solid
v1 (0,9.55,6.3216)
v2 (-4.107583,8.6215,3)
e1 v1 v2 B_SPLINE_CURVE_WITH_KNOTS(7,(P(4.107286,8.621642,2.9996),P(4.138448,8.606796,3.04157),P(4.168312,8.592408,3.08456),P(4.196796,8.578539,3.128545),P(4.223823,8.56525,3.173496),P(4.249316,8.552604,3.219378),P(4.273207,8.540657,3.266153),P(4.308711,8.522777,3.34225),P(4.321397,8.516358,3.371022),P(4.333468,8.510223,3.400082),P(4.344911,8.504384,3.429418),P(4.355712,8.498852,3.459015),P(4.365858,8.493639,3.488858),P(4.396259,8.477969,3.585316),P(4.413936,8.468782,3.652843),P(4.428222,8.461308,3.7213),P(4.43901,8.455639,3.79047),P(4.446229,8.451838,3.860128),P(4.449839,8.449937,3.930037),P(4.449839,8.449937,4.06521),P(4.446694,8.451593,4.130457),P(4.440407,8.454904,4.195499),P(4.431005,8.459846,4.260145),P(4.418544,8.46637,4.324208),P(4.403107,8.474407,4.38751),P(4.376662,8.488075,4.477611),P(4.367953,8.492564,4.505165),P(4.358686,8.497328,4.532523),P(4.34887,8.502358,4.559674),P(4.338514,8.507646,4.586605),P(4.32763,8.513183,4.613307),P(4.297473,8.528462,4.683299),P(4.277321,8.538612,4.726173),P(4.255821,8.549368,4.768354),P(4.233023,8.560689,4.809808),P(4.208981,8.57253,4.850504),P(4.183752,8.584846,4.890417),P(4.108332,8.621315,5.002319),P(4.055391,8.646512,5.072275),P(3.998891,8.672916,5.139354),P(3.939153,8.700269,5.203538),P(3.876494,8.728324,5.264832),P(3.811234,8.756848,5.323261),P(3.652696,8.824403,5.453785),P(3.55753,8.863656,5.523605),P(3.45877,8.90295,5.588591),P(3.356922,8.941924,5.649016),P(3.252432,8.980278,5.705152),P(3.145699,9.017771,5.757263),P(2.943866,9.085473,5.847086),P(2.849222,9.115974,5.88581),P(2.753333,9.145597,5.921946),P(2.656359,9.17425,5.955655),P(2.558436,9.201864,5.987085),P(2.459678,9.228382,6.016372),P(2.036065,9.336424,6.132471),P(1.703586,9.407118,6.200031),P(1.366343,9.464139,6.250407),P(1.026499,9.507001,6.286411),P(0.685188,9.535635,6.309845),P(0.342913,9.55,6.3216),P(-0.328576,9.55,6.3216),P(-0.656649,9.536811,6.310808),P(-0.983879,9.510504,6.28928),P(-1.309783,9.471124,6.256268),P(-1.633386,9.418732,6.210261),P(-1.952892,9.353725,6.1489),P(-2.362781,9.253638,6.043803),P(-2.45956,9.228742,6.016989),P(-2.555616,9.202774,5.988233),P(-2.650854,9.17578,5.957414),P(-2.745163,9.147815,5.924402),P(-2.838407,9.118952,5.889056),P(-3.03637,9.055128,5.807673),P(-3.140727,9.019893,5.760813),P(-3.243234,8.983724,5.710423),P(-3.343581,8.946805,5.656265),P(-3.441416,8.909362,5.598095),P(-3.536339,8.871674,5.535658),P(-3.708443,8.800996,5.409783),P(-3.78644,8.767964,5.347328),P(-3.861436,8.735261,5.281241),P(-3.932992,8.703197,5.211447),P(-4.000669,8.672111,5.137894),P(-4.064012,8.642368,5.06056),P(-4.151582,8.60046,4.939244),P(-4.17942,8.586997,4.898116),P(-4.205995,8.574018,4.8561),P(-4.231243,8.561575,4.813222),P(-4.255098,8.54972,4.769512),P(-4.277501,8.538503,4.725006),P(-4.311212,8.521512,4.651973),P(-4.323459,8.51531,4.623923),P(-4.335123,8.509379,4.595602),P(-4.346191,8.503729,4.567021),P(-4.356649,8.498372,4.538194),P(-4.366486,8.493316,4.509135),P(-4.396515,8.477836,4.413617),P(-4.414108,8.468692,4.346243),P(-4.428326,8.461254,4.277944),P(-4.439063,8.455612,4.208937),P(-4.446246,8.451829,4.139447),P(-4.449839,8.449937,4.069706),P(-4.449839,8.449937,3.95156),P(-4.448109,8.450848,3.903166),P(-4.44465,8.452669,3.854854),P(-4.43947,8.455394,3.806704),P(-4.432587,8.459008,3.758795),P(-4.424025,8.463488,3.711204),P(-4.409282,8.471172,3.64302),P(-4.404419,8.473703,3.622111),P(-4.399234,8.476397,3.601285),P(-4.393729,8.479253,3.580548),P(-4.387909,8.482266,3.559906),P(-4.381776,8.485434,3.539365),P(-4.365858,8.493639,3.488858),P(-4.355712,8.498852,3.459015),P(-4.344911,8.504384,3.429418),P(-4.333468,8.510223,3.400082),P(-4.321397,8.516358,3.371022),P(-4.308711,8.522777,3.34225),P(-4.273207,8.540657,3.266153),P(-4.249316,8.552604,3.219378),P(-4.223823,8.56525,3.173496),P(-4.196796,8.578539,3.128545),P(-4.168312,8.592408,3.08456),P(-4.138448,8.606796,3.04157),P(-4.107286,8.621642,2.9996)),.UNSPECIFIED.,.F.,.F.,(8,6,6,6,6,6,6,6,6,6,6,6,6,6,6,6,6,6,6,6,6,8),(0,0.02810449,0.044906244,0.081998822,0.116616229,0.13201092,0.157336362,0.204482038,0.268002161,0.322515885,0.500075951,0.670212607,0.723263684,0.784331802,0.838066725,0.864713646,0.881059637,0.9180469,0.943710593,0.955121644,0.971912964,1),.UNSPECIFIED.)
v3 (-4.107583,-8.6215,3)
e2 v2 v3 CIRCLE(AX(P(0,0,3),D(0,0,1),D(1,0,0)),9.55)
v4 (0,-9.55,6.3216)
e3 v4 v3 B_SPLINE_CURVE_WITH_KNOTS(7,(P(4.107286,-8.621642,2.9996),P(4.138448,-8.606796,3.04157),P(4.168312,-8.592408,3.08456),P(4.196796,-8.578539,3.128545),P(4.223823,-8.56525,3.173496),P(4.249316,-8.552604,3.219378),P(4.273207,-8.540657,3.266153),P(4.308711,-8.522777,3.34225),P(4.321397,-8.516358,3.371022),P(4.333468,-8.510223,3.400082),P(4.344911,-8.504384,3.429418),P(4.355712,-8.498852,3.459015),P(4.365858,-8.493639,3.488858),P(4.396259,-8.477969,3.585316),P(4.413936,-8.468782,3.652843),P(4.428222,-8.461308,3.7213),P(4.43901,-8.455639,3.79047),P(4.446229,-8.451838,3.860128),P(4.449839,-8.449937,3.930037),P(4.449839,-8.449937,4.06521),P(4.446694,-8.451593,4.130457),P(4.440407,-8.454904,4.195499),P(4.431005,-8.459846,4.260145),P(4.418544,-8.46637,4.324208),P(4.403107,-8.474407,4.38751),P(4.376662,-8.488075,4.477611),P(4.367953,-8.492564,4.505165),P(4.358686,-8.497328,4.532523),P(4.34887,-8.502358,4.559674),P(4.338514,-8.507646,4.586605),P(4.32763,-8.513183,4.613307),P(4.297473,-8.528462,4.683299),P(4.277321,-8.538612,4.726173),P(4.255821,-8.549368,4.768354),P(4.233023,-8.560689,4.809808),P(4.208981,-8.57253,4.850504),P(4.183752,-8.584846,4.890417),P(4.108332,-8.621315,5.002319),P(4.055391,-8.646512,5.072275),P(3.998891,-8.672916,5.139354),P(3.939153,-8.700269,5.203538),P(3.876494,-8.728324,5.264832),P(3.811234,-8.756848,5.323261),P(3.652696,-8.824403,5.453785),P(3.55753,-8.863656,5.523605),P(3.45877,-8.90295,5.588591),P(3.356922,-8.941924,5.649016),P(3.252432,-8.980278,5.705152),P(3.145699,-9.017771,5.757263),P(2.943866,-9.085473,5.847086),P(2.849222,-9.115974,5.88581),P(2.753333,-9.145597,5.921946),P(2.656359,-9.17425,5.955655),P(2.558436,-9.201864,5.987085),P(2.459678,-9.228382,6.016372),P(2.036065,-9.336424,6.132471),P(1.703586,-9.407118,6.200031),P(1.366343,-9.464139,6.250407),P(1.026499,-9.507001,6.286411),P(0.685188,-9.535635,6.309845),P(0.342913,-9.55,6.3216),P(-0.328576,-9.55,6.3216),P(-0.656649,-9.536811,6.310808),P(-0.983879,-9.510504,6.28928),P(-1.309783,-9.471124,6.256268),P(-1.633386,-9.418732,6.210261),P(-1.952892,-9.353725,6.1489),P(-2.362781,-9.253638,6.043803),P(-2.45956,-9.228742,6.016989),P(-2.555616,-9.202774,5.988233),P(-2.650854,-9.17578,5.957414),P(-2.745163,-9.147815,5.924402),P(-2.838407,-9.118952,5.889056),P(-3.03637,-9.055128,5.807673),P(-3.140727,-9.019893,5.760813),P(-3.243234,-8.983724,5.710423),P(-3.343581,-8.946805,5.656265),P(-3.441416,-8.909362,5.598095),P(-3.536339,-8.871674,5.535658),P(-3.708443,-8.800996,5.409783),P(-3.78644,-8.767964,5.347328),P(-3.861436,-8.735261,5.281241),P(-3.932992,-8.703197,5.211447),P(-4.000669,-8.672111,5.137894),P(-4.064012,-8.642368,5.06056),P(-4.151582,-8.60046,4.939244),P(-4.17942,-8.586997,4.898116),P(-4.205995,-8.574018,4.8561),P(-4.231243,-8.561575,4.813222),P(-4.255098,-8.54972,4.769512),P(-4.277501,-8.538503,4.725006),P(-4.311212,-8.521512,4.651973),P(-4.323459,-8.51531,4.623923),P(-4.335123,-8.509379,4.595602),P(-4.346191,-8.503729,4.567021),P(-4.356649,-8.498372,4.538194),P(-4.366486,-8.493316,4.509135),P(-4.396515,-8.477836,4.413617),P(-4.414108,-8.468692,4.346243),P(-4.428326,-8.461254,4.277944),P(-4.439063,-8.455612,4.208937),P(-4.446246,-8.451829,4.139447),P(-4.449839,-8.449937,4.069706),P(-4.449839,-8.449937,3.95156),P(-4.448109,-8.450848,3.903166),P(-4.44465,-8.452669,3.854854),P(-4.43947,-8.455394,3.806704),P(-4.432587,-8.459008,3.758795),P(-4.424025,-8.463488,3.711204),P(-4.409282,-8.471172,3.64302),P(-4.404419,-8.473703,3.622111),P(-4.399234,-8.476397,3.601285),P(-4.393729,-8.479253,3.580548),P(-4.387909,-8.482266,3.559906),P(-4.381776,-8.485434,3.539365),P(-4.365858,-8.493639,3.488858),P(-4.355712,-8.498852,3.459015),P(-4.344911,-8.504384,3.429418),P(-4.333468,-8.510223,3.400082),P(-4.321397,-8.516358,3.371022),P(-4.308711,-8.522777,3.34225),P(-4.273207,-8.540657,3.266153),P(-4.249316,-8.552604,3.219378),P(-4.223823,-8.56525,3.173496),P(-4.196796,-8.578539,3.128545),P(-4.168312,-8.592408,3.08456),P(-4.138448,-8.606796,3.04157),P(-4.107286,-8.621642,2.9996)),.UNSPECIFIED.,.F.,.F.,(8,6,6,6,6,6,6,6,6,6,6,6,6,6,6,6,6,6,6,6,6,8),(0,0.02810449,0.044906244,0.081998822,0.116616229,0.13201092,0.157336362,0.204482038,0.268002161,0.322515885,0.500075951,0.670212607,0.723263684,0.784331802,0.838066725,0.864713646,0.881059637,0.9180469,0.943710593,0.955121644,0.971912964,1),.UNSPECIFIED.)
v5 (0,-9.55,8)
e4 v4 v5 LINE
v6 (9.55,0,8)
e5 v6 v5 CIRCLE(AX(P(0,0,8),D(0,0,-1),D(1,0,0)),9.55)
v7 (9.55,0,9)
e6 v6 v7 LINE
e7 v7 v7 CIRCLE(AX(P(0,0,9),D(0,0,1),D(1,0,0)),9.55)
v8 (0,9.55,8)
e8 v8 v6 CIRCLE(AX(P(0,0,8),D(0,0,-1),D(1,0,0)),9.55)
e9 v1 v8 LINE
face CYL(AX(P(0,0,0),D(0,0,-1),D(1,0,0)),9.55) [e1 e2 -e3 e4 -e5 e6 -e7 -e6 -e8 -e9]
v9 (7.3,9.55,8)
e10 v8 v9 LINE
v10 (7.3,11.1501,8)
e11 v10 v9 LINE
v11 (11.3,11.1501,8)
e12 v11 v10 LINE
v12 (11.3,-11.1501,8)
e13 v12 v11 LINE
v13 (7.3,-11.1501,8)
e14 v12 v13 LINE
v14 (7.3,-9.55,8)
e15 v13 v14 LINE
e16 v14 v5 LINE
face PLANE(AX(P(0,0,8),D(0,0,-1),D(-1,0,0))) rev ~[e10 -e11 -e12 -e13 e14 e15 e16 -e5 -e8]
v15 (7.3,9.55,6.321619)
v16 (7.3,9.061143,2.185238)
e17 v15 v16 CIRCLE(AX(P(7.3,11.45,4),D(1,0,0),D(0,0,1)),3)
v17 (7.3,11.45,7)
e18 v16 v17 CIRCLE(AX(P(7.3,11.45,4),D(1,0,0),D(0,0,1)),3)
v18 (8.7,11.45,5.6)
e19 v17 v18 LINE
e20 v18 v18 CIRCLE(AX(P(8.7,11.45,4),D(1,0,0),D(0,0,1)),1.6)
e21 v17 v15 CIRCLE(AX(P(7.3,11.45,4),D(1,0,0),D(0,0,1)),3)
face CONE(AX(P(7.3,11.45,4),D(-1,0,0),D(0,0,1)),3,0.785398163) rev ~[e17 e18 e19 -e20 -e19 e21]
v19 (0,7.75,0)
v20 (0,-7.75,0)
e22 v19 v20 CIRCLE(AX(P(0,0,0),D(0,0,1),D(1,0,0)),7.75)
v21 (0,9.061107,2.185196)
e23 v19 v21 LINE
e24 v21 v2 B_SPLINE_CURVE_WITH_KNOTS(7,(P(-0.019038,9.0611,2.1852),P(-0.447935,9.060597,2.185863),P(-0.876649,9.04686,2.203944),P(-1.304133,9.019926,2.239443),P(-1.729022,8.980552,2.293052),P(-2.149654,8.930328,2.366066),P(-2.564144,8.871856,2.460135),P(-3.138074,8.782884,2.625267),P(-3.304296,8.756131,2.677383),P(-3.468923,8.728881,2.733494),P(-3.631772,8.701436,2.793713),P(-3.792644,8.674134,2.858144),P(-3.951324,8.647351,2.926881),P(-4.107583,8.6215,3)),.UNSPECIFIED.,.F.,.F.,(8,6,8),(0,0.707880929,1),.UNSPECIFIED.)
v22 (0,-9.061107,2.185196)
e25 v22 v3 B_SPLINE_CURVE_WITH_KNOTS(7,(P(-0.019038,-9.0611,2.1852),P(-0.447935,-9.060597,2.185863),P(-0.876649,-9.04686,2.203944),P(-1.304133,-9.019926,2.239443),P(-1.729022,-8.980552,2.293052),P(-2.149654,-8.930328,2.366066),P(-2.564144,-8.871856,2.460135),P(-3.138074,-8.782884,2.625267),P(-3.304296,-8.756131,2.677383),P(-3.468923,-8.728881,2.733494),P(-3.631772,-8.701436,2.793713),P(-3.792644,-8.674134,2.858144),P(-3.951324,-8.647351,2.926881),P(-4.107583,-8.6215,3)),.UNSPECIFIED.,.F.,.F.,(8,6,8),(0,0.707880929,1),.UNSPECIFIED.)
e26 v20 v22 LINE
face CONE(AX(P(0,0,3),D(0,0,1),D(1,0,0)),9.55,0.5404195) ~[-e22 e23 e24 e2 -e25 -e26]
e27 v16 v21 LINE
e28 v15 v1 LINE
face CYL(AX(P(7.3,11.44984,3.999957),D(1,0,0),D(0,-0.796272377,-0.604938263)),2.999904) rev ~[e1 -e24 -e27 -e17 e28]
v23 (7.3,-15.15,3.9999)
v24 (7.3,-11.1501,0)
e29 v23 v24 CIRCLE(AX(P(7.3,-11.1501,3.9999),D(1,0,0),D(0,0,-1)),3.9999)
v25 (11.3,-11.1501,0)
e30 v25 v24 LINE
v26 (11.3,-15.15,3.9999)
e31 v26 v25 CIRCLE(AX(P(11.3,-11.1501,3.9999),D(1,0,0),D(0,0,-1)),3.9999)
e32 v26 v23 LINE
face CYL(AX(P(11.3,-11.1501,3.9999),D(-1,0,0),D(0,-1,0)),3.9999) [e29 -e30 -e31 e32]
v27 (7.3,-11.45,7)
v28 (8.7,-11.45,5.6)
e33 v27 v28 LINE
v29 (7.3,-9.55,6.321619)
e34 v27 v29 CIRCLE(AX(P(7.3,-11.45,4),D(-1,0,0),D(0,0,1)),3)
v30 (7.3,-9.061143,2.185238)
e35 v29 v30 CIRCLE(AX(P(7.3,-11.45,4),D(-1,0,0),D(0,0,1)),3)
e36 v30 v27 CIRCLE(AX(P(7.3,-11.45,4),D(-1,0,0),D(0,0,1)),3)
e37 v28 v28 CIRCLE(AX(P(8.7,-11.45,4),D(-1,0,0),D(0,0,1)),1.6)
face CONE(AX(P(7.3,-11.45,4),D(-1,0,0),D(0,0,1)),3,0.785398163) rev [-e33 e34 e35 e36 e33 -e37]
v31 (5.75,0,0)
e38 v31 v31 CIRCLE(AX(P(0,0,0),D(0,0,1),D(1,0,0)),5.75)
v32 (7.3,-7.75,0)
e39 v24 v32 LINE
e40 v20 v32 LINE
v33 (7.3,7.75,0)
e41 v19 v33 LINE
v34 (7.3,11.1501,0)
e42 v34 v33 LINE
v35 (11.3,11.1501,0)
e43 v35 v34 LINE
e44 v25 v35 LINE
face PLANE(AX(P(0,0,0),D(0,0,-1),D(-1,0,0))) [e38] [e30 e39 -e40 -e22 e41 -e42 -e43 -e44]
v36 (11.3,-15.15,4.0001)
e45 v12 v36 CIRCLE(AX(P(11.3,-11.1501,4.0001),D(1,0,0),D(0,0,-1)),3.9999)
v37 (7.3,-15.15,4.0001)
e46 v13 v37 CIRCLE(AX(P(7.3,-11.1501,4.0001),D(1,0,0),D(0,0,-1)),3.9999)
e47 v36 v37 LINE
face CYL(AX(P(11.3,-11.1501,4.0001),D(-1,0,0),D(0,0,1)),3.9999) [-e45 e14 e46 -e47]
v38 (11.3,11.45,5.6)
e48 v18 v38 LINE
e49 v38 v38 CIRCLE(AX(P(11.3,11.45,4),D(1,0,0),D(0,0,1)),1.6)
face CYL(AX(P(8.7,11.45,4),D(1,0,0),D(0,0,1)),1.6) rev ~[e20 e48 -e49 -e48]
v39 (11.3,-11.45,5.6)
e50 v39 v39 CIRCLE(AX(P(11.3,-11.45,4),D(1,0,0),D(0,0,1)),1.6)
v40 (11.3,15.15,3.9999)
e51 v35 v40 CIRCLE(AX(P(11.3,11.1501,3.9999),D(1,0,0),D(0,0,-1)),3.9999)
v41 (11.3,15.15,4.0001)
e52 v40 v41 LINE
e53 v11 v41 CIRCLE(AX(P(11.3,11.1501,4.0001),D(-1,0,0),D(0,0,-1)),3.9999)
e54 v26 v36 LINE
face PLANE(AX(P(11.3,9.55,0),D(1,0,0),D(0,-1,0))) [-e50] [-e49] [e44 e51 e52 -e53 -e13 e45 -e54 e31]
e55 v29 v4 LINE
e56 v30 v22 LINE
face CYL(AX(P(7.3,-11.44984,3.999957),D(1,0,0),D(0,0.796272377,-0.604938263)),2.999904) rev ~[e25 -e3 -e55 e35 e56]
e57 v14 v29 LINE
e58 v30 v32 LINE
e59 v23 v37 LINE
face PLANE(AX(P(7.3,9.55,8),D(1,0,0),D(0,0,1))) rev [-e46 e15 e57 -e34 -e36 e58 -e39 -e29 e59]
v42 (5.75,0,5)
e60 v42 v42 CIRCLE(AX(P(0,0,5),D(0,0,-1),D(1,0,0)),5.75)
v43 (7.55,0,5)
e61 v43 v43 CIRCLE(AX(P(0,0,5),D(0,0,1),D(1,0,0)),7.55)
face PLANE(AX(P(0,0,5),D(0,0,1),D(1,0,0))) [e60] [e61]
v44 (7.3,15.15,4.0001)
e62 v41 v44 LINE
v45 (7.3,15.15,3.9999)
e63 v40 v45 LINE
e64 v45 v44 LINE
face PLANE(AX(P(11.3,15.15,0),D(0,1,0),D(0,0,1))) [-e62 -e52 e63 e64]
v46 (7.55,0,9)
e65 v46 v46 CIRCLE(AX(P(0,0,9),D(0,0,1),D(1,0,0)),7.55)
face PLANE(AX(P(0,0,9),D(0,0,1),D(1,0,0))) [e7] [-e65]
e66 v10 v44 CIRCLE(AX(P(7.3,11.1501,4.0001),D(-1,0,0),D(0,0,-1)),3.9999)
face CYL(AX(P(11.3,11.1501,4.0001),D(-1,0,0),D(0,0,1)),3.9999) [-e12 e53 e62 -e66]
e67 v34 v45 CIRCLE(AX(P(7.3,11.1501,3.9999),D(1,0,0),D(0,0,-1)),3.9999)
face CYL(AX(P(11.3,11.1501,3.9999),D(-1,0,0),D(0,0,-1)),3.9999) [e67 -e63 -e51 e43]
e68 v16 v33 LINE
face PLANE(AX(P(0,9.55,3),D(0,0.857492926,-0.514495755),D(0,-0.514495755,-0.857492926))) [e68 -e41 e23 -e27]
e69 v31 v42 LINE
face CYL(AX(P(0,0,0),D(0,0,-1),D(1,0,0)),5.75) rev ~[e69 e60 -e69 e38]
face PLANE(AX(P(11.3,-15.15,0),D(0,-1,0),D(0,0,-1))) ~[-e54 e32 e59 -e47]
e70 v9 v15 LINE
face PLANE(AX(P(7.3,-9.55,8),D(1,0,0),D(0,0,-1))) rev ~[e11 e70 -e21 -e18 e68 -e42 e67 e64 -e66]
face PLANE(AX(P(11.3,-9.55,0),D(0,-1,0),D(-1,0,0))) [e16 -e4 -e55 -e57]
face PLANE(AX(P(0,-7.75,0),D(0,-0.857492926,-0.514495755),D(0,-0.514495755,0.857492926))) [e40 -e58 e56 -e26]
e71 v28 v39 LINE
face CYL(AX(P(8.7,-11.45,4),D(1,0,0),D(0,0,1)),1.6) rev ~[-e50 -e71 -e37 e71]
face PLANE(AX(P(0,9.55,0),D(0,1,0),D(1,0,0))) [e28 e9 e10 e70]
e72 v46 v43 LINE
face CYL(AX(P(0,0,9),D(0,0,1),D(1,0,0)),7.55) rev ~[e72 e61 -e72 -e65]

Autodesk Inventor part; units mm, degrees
ref_plane "YZ Plane" through (0, 0, 0) normal (1, 0, 0) x (0, 1, 0)
ref_plane "XZ Plane" through (0, 0, 0) normal (0, 1, 0) x (-1, 0, 0)
sketch "Эскиз1" plane through (0, 0, 0) normal (0, 0, 1) x (1, 0, 0)
  circle A0 centre (0, 0) radius 5.75
  circle A1 centre (0, 0) radius 9.55
  dimension "d0" = 11.5
  dimension "d1" = 19.1
extrude "Выдавливание1" add sketch "Эскиз1" along normal blind 9
sketch "Эскиз2" plane through (0, 0, 9) normal (0, 0, 1) x (1, 0, 0)
  circle A0 centre (0, 0) radius 7.55
  dimension "d4" = 15.1
extrude "Выдавливание2" cut sketch "Эскиз2" against normal blind 4
chamfer "Фаска1" distance 3 distance2 1.8 1 edges at (-9.55, 0, 0) measured on face at (9.519, -0.7685, 6)
sketch "Эскиз3" plane through (0, 0, 0) normal (0, 0, -1) x (-1, 0, 0)
  circle A0 centre (0, 0) radius 5.75 projected
  circle A1 centre (0, 0) radius 7.75 projected
  circle A2 centre (0, 0) radius 9.55 projected
  line L0 (0, 9.55) -> (-11.3, 9.55)
  line L1 (-11.3, 9.55) -> (-11.3, -9.55)
  line L2 (-11.3, -9.55) -> (0, -9.55)
  line L3 (0, -9.55) -> (0, 9.55)
  point P0 (0, -7.75)
  point P1 (0, 7.75)
  dimension "d10" = 11.3
extrude "Выдавливание3" add sketch "Эскиз3" against normal blind 8 contours A1 L3 A2 | A2 L2 L1 L0 picked at (-0.7618, -8.8575)
sketch "Эскиз4" plane through (0, 7.75, 0) normal (-1, 0, 0) x (0, 0, 1)
  line L0 (3, 1.8) -> (0, 0) projected
  line L1 (0, 1.8) -> (3, 1.8) projected
  line L2 (0, 0) -> (0, 1.8) projected
  line L3 (0, -17.3) -> (3, -17.3) projected
  line L4 (0, -15.5) -> (3, -17.3) projected
  line L5 (0, -17.3) -> (0, -15.5) projected
  line L6 (0, -17.3) -> (3, -17.3) projected
  point P0 (0, -7.75)
extrude "Выдавливание4" cut sketch "Эскиз4" against normal through all
sketch "Эскиз5" plane through (11.3, -9.55, 8) normal (1, 0, 0) x (0, 0, -1)
  line L0 (0, 19.1) -> (0, 0) projected
  line L1 (0, 19.1) -> (8, 19.1)
  line L2 (8, 19.1) -> (8, 24.7)
  line L3 (8, 24.7) -> (0, 24.7)
  line L4 (0, 24.7) -> (0, 19.1)
  line L5 (8, 19.1) -> (5, 19.1)
  line L6 (5, 19.1) -> (5, 16.7)
  line L7 (5, 16.7) -> (8, 16.7)
  line L8 (8, 16.7) -> (8, 19.1)
  line L9 (5, 0) -> (5, 19.1) projected
  point P0 (8, 9.55)
  dimension "d15" = 8
  dimension "d16" = 5.6
  dimension "d26" = 8
extrude "Выдавливание5" add sketch "Эскиз5" against normal blind 4
sketch "Эскиз6" plane through (7.3, -9.55, 8) normal (-1, 0, 0) x (0, 0, 1)
  line L0 (-5, 19.1) -> (-8, 17.3) projected
  line L1 (0, 19.1) -> (-5, 19.1) projected
  line L2 (0, 19.1) -> (0, 24.7) projected
  line L3 (0, 24.7) -> (-8, 24.7) projected
  line L4 (-8, 24.7) -> (-8, 17.3) projected
  line L5 (-8, 24.7) -> (-8, 17.3) projected
  line L6 (-8, 21) -> (0, 21)
  line L7 (0, 19.1) -> (0, 24.7) projected
  point P0 (-8, 9.55)
  point P1 (-4, 21)
hole "Отверстие1" at (7.3, 11.45, 4) direction (1, 0, 0) diameter 3.2 end through all countersink diameter 6 countersink angle 90
sketch "Эскиз8" plane through (7.3, -9.55, 8) normal (-1, 0, 0) x (0, 0, 1)
  arc A0 (-1.6784, 19.1) -> (-5.8148, 18.6111) centre (-4, 21) ccw projected
  circle A1 centre (-4, 21) radius 1.6 projected
  arc A2 (-1.6784, 19.1) -> (-5.8148, 18.6111) centre (-4, 21) ccw projected
  arc A3 (-5.8148, 18.6111) -> (-1.6784, 19.1) centre (-4, 21) ccw projected
  circle A4 centre (-4, 21) radius 1.6 projected
  point P0 (-8, 9.55)
  point P1 (-5.8148, 18.6111)
  point P2 (-1.6784, 19.1)
extrude "Выдавливание6" cut sketch "Эскиз8" along normal through all contours A3 A0 | A1
fillet "Сопряжение1" radius 4 2 edges at (9.3, 15.15, 0) (9.3, 15.15, 8)
ref_plane "РабПлоскость1" through (0, 0, 8) normal (0, 1, 0) x (1, 0, 0)
mirror "Зеркальное отражение1" about plane through (0, 0, 8) normal (0, 1, 0) of "Сопряжение1", "Отверстие1", "Выдавливание6", "Выдавливание5"
properties part number "Крепление дифференциала"
